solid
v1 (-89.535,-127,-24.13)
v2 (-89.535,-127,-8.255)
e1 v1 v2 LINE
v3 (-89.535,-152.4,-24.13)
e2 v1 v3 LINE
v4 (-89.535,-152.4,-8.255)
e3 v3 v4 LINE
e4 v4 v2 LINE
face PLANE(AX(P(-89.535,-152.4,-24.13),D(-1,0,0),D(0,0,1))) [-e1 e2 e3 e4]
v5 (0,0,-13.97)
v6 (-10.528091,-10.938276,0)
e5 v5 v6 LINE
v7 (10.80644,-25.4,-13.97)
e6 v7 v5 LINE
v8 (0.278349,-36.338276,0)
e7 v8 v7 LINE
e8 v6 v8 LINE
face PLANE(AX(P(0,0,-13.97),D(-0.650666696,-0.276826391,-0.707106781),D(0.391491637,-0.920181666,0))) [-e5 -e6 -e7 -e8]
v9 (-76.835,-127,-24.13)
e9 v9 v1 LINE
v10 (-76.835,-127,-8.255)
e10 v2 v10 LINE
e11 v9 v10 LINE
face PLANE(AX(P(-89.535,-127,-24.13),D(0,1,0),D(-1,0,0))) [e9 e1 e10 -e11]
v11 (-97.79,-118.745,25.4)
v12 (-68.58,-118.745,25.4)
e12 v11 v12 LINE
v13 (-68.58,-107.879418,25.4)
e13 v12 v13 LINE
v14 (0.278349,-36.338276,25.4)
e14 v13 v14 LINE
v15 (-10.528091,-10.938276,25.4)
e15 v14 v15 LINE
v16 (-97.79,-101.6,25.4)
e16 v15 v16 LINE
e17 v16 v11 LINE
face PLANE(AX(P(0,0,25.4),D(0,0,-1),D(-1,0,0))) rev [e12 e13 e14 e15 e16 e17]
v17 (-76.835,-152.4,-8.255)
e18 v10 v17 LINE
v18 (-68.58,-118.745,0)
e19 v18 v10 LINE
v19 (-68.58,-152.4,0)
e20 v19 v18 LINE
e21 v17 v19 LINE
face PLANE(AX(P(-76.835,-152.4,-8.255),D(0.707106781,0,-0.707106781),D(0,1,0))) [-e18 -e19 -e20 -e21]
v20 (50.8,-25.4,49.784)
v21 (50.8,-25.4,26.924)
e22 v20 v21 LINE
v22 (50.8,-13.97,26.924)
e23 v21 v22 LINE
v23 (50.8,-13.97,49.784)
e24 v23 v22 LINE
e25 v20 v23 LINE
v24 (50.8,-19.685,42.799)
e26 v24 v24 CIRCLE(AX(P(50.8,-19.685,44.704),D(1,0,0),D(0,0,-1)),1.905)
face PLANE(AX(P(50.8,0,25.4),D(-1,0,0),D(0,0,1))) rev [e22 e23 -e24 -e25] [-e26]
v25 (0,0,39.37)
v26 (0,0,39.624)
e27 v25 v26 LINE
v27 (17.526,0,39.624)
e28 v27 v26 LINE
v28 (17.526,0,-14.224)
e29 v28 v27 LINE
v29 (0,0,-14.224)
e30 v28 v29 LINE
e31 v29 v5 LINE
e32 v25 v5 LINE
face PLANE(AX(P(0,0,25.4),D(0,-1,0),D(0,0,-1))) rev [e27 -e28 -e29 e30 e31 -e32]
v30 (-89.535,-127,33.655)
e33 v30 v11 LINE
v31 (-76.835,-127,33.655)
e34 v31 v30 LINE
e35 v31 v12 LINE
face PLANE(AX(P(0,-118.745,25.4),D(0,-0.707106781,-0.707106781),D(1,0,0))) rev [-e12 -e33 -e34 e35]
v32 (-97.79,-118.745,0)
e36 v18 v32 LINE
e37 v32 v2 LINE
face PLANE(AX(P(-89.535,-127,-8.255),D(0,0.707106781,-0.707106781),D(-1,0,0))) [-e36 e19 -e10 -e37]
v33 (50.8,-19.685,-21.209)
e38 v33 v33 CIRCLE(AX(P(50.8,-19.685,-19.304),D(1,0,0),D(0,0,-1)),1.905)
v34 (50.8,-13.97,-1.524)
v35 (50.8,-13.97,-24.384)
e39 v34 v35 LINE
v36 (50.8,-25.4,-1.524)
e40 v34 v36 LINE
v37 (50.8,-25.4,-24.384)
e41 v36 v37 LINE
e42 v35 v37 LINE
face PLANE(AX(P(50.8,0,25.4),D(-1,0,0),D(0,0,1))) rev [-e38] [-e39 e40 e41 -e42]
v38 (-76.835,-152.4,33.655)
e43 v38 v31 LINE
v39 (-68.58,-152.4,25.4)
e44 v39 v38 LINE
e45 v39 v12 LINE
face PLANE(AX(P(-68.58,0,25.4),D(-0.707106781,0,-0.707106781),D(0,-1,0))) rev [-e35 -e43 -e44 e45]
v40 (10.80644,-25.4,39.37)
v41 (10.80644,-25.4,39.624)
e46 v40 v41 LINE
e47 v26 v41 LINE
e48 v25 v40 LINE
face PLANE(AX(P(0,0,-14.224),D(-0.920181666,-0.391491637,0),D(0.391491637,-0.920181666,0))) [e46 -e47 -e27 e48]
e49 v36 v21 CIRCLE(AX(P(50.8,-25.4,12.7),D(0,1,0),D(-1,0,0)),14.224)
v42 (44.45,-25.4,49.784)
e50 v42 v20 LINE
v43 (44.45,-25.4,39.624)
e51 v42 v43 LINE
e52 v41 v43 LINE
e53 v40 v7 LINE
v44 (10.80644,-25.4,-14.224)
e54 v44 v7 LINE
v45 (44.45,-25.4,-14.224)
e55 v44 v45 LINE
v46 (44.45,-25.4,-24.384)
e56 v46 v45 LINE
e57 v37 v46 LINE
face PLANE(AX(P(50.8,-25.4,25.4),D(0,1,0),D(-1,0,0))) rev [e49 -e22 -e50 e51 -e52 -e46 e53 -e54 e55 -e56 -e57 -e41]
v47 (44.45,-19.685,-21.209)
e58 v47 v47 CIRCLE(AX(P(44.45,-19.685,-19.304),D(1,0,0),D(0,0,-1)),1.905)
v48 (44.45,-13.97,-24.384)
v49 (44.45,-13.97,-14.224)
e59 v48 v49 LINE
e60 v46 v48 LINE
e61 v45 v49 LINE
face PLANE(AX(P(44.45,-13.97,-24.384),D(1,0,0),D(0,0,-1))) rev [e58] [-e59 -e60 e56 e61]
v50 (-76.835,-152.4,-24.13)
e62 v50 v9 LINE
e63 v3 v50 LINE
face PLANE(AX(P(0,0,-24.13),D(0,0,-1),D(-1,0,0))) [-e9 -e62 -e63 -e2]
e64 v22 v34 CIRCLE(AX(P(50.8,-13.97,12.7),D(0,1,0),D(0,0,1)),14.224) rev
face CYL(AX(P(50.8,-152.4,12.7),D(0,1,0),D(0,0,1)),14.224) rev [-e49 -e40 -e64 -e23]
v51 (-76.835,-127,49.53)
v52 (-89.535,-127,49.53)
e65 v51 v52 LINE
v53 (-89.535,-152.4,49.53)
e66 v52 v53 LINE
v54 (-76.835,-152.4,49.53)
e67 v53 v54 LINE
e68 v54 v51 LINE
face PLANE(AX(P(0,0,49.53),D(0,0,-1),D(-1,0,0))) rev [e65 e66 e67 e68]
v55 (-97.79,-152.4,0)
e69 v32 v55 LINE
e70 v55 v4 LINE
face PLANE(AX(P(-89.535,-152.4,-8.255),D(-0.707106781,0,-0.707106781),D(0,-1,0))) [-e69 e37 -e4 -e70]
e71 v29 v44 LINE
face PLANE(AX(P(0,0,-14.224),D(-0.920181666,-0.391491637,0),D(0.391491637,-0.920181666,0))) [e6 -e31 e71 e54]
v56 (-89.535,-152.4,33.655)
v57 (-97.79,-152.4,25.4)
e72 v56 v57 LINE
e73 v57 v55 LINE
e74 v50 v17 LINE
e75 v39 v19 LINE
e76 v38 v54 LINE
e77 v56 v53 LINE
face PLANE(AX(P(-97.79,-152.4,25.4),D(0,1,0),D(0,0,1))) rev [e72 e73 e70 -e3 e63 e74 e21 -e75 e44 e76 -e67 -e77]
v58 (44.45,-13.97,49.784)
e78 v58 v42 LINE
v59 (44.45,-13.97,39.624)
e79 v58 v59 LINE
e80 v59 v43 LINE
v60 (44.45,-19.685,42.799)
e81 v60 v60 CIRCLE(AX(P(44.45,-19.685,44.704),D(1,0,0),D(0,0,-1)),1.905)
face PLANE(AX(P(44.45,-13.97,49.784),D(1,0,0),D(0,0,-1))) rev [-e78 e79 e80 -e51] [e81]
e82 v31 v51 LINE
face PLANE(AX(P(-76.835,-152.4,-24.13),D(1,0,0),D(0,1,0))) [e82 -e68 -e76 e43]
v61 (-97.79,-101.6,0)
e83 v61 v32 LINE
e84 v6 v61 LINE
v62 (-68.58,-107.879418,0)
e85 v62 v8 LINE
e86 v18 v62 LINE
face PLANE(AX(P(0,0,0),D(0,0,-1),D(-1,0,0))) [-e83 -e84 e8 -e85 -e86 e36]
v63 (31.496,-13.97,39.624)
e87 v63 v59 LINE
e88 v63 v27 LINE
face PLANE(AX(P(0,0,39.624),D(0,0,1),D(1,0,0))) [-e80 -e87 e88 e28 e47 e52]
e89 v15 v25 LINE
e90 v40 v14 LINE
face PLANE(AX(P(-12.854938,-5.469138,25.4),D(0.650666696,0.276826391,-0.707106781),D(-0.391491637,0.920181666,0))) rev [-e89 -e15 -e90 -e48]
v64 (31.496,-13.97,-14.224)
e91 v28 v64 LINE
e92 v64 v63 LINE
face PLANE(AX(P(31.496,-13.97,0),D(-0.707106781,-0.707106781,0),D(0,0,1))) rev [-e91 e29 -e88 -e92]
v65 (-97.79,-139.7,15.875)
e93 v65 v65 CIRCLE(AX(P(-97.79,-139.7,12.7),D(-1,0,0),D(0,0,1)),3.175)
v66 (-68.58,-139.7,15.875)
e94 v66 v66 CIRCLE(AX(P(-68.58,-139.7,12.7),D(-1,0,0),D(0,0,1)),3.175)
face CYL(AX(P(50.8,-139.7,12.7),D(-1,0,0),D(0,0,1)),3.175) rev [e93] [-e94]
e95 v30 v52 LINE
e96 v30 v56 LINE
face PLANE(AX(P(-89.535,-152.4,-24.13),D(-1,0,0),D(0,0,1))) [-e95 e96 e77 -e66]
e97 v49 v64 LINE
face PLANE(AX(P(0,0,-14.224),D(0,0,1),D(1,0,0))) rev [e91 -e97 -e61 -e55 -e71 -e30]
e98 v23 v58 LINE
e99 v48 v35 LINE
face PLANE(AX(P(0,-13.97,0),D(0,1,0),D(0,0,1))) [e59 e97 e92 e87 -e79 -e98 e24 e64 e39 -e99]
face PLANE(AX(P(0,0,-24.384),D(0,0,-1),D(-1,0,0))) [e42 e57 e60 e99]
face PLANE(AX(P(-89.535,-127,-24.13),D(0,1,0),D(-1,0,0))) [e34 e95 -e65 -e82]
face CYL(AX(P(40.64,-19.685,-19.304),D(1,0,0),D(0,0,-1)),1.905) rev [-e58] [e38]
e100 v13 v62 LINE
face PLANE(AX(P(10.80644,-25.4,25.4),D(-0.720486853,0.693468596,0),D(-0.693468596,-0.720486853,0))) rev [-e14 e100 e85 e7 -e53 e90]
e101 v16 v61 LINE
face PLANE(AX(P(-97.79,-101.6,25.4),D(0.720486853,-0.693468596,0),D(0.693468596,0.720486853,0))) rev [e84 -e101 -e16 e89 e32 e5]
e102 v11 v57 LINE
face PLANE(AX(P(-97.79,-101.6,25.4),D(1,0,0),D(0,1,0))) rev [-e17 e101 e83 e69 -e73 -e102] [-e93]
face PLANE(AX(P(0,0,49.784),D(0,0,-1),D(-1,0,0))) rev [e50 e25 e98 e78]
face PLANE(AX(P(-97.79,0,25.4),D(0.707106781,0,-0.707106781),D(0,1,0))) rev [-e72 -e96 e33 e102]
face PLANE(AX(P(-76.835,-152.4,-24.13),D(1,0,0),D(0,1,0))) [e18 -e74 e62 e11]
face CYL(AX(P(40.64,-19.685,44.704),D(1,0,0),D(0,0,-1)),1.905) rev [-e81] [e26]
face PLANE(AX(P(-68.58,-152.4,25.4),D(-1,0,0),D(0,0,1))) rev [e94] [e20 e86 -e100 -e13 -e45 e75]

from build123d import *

# Parameters (mm, degrees)
BOSS_EXTRUDE1_DEPTH      = 25.4
BOSS_EXTRUDE4_DEPTH      = 24.13
BOSS_EXTRUDE4_DEPTH_BACK = 49.53
SKETCH7_W                = 12.7
SKETCH7_H                = 25.4
SKETCH8_R                = 3.175
CUT_EXTRUDE3_DEPTH       = 219.535967291
CHAMFER3_SIZE            = 8.255
BOSS_EXTRUDE5_DEPTH      = 14.224
BOSS_EXTRUDE5_DEPTH_BACK = 39.624
SKETCH9_R                = 14.224
CUT_EXTRUDE4_DEPTH       = 188.728167838
SKETCH11_W               = 33.274
SKETCH11_H               = 53.848
CUT_EXTRUDE5_DEPTH       = 13.97
CHAMFER4_SIZE            = 13.97
CHAMFER5_SIZE            = 13.97
SKETCH18_W               = 6.35
SKETCH18_H               = 11.43
BOSS_EXTRUDE6_DEPTH      = 10.16
SKETCH19_W               = 6.35
SKETCH19_H               = 11.43
BOSS_EXTRUDE7_DEPTH      = 10.16
SKETCH20_R               = 1.905
CUT_EXTRUDE7_DEPTH       = 10.16


with BuildPart() as part:
    # Sketch2 → Boss-Extrude1 (new body)
    with BuildSketch(Plane.XY):
        Polygon((0, 0), (50.8, 0), (50.8, -25.4), (10.806439585, -25.4), (-68.58, -107.87941775), (-68.58, -152.4), (-97.79, -152.4), (-97.79, -101.6), align=None)
    extrude(amount=BOSS_EXTRUDE1_DEPTH)

    # Sketch7 → Boss-Extrude4 (add, two sides: drawn at the far end of the back side and taken through both)
    with BuildSketch(Plane.XY.offset(25.4).offset(-BOSS_EXTRUDE4_DEPTH_BACK)):
        with Locations((-83.185, -139.7)):
            Rectangle(SKETCH7_W, SKETCH7_H)
    extrude(amount=BOSS_EXTRUDE4_DEPTH + BOSS_EXTRUDE4_DEPTH_BACK)

    # Sketch8 → Cut-Extrude3 (cut, through all)
    with BuildSketch(Plane.ZY.offset(97.79)):
        with Locations((12.7, -139.7)):
            Circle(SKETCH8_R)
    extrude(amount=-CUT_EXTRUDE3_DEPTH, mode=Mode.SUBTRACT)

    # Chamfer3
    chamfer3_edges = [part.edges().sort_by_distance(p)[0] for p in [
        (-76.835, -139.7, 25.4),
        (-76.835, -139.7, 0),
        (-83.185, -127, 25.4),
        (-83.185, -127, 0),
        (-89.535, -139.7, 25.4),
        (-89.535, -139.7, 0),
    ]]
    chamfer(chamfer3_edges, length=CHAMFER3_SIZE - 0.0001)  # a hair under: the kernel refuses the full size

    # Sketch10 → Boss-Extrude5 (add, two sides: drawn at the far end of the back side and taken through both)
    with BuildSketch(Plane.XY.offset(25.4).offset(-BOSS_EXTRUDE5_DEPTH_BACK)):
        Polygon((0, 0), (10.806439585, -25.4), (50.8, -25.4), (50.8, 0), align=None)
    extrude(amount=BOSS_EXTRUDE5_DEPTH + BOSS_EXTRUDE5_DEPTH_BACK)

    # Sketch9 → Cut-Extrude4 (cut, through all)
    with BuildSketch(Plane(origin=(0, 0, 0), x_dir=(1, 0, 0), z_dir=(0, 1, 0))):
        with Locations((50.8, -12.7)):
            Circle(SKETCH9_R)
    extrude(amount=-CUT_EXTRUDE4_DEPTH, mode=Mode.SUBTRACT)

    # Sketch11 → Cut-Extrude5 (cut)
    with BuildSketch(Plane(origin=(0, 0, 0), x_dir=(1, 0, 0), z_dir=(0, 1, 0))):
        with Locations((34.163, -12.7)):
            Rectangle(SKETCH11_W, SKETCH11_H)
    extrude(amount=-CUT_EXTRUDE5_DEPTH, mode=Mode.SUBTRACT)

    # Chamfer4
    chamfer4_edges = [part.edges().sort_by_distance(p)[0] for p in [
        (17.526, -13.97, 12.7),
    ]]
    chamfer(chamfer4_edges, length=CHAMFER4_SIZE - 0.0001)  # a hair under: the kernel refuses the full size

    # Chamfer5
    chamfer5_edges = [part.edges().sort_by_distance(p)[0] for p in [
        (5.403219792, -12.7, 0),
        (5.403219792, -12.7, 25.4),
    ]]
    chamfer(chamfer5_edges, length=CHAMFER5_SIZE)

    # Sketch18 → Boss-Extrude6 (add)
    with BuildSketch(Plane.XY.offset(39.624)):
        with Locations((47.625, -19.685)):
            Rectangle(SKETCH18_W, SKETCH18_H)
    extrude(amount=BOSS_EXTRUDE6_DEPTH)

    # Sketch19 → Boss-Extrude7 (add)
    with BuildSketch(Plane(origin=(0, 0, -14.224), x_dir=(-1, 0, 0), z_dir=(0, 0, -1))):
        with Locations((-47.625, -19.685)):
            Rectangle(SKETCH19_W, SKETCH19_H)
    extrude(amount=BOSS_EXTRUDE7_DEPTH)

    # Sketch20 → Cut-Extrude7 (cut)
    with BuildSketch(Plane(origin=(50.8, 0, 0), x_dir=(0, 0, -1), z_dir=(1, 0, 0))):
        with Locations((-44.704, -19.685)):
            Circle(SKETCH20_R)
        with Locations((19.304, -19.685)):
            Circle(SKETCH20_R)
    extrude(amount=-CUT_EXTRUDE7_DEPTH, mode=Mode.SUBTRACT)


solid = part.part
